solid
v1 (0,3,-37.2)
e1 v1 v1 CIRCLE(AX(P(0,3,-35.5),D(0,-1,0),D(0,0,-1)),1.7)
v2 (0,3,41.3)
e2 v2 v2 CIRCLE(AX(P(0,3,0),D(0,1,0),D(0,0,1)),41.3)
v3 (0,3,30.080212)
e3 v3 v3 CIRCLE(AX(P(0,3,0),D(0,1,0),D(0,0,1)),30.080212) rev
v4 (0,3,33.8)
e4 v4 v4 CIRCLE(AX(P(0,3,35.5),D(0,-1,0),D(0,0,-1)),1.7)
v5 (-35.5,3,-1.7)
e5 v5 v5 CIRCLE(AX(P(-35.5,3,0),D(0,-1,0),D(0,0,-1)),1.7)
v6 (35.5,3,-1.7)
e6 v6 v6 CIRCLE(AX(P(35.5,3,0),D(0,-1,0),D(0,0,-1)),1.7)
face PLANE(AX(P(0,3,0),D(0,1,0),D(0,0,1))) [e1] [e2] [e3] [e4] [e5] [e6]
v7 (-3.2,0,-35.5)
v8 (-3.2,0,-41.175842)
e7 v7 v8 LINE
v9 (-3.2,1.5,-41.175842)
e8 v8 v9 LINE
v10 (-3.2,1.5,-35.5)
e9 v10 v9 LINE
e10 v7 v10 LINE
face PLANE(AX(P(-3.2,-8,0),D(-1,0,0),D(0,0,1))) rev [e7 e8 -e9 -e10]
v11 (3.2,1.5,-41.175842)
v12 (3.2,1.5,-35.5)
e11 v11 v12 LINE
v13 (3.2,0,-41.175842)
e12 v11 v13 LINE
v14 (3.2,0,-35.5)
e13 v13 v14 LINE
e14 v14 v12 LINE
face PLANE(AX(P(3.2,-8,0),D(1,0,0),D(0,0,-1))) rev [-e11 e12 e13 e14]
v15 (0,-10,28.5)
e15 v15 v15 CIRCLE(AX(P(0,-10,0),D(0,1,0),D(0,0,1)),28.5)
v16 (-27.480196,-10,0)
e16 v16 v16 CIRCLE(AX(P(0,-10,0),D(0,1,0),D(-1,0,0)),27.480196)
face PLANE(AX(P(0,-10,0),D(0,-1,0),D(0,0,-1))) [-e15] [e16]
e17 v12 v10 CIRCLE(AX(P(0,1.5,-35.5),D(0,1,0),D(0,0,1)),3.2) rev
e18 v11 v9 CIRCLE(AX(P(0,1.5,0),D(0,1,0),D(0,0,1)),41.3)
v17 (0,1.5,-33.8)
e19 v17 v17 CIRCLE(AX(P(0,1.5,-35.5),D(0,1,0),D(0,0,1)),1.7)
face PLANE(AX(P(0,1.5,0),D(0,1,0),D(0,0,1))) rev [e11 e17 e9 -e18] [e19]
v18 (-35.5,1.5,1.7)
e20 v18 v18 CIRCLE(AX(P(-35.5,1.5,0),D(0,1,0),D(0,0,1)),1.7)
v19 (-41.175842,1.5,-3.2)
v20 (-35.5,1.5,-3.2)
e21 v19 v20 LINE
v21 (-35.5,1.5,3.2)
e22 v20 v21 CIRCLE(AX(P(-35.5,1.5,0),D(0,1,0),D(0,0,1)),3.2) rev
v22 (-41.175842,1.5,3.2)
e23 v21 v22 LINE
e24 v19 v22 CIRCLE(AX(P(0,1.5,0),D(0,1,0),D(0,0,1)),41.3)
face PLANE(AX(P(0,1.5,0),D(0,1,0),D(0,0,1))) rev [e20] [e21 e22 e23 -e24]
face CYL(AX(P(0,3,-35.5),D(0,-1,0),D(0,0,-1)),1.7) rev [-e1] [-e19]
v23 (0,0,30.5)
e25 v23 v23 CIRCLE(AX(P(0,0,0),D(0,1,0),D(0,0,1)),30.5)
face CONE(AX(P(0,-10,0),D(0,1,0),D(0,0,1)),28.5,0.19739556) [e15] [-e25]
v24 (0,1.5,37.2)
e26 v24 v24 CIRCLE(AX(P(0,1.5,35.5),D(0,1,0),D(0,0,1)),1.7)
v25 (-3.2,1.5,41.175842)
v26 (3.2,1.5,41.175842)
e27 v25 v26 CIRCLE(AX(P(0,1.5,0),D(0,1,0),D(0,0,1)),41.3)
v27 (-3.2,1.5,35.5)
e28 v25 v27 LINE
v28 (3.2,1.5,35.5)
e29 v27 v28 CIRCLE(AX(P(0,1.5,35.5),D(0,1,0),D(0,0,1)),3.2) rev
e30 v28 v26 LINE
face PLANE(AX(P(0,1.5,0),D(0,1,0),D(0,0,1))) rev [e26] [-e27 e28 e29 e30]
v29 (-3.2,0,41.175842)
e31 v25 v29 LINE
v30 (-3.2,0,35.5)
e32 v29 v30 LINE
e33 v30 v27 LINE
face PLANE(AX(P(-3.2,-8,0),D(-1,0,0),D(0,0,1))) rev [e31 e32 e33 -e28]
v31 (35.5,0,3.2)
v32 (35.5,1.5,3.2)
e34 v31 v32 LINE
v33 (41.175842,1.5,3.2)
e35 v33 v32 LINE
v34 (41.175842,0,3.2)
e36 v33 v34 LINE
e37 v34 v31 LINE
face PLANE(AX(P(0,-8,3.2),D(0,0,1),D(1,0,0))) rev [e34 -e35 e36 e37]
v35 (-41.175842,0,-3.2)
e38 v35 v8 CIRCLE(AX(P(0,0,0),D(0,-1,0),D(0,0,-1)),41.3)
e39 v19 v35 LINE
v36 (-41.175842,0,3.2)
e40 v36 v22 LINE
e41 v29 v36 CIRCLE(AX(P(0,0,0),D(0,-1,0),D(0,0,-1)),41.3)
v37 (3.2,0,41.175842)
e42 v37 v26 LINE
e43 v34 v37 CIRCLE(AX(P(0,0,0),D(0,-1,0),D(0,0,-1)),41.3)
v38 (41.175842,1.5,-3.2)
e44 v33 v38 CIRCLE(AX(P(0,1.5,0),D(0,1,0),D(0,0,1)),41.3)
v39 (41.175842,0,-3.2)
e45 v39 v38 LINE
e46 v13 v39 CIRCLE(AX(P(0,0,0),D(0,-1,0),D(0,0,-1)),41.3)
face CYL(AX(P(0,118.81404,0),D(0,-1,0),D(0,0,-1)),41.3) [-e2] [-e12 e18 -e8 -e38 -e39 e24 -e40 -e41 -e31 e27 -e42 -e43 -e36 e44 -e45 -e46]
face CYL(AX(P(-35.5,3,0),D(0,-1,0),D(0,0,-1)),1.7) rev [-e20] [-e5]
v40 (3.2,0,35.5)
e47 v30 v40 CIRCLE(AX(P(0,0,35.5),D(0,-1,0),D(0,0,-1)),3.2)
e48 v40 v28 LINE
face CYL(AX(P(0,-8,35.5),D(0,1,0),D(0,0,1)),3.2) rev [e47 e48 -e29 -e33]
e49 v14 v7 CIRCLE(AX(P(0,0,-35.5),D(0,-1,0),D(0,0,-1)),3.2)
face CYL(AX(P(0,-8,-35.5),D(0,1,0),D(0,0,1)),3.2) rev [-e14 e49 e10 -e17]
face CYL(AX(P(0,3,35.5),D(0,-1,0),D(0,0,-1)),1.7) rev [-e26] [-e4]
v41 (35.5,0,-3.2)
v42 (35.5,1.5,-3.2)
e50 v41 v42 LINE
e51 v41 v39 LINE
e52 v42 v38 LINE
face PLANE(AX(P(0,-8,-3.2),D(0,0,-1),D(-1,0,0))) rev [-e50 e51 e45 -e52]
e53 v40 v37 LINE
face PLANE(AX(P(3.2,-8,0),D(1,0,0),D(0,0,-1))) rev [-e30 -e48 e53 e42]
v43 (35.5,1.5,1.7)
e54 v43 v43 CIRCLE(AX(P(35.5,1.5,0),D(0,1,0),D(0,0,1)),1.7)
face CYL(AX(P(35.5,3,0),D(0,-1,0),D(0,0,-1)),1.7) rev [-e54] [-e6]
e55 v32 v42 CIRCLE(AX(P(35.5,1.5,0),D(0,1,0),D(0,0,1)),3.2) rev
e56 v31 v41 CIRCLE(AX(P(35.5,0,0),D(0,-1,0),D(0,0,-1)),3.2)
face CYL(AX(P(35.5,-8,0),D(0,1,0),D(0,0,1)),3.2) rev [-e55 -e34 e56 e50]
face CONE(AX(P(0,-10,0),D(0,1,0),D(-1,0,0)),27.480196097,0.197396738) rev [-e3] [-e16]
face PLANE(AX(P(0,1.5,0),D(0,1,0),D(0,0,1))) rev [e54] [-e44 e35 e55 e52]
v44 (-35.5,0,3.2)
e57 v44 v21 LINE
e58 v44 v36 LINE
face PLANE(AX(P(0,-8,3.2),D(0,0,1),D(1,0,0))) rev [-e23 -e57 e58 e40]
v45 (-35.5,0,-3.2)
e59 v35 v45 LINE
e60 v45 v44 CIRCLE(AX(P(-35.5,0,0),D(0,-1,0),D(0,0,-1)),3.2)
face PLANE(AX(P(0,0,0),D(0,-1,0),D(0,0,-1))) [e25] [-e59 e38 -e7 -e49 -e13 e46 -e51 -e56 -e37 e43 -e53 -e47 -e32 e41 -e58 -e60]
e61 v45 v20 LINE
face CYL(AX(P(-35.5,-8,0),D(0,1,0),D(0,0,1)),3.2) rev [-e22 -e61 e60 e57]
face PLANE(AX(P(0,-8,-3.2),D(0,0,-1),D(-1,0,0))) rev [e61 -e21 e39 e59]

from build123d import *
from build123d.topology import SkipClean

# Parameters (mm, degrees)
SKETCH3_R           = 40
SKETCH3_R_2         = 35.480196097
BOSS_EXTRUDE1_DEPTH = 2
BOSS_EXTRUDE2_START = -2
SKETCH4_R           = 41.3
SKETCH4_R_2         = 40
BOSS_EXTRUDE2_DEPTH = 2
CUT_EXTRUDE1_DEPTH  = 10
SKETCH7_R           = 29.880196097
BOSS_EXTRUDE3_DEPTH = 0.5
BOSS_EXTRUDE4_START = 1
SKETCH8_R           = 41.3
SKETCH8_R_2         = 29.880196097
BOSS_EXTRUDE4_DEPTH = 1
SKETCH12_R          = 1.7
CUT_EXTRUDE2_DEPTH  = 60.256898333


# Read off the part's stored shape, not the designer's step: Revolve3
with BuildPart() as part:
    # Revolve3 outline → Revolve3 (revolve)
    with BuildSketch(Plane.XY):
        Polygon((35.480196097, 2), (29.880196097, 2), (27.480196097, -10), (28.5, -10), (30.5, 0), (35.480196097, 0), align=None)
    revolve(axis=Axis((0, 0, 0), (0, 1, 0)))

    # Sketch3 → Boss-Extrude1 (add)
    with BuildSketch(Plane(origin=(0, 2, 0), x_dir=(1, 0, 0), z_dir=(0, 1, 0))):
        with Locations(Location((0, 0, 0), (0, 0, 270))):
            Circle(SKETCH3_R)
        Circle(SKETCH3_R_2, mode=Mode.SUBTRACT)
    extrude(amount=-BOSS_EXTRUDE1_DEPTH)

    # Sketch4 → Boss-Extrude2 (add)
    with BuildSketch(Plane.XZ.offset(BOSS_EXTRUDE2_START)):
        with Locations(Location((0, 0, 0), (0, 0, 270))):
            Circle(SKETCH4_R)
        Circle(SKETCH4_R_2, mode=Mode.SUBTRACT)
    extrude(amount=BOSS_EXTRUDE2_DEPTH)

    # Sketch6 → Cut-Extrude1 (cut)
    with BuildSketch(Plane(origin=(0, 2, 0), x_dir=(1, 0, 0), z_dir=(0, 1, 0))):
        with BuildLine():
            ThreePointArc((41.3, 0), (41.268948935, 1.601203852), (41.175842432, 3.2))
            Line((41.175842432, 3.2), (35.5, 3.2))
            ThreePointArc((35.5, 3.2), (32.3, 0), (35.5, -3.2))
            Line((35.5, -3.2), (41.175842432, -3.2))
            ThreePointArc((41.175842432, -3.2), (41.268948935, -1.601203852), (41.3, 0))
        make_face()
        with BuildLine():
            ThreePointArc((-3.2, -41.175842432), (0, -41.3), (3.2, -41.175842432))
            Line((3.2, -41.175842432), (3.2, -35.5))
            ThreePointArc((3.2, -35.5), (0, -32.3), (-3.2, -35.5))
            Line((-3.2, -35.5), (-3.2, -41.175842432))
        make_face()
        with BuildLine():
            Line((-35.5, 3.2), (-41.175842432, 3.2))
            ThreePointArc((-41.175842432, 3.2), (-41.3, 0), (-41.175842432, -3.2))
            Line((-41.175842432, -3.2), (-35.5, -3.2))
            ThreePointArc((-35.5, -3.2), (-32.3, 0), (-35.5, 3.2))
        make_face()
        with BuildLine():
            ThreePointArc((-3.2, 35.5), (0, 32.3), (3.2, 35.5))
            Line((3.2, 35.5), (3.2, 41.175842432))
            ThreePointArc((3.2, 41.175842432), (0, 41.3), (-3.2, 41.175842432))
            Line((-3.2, 41.175842432), (-3.2, 35.5))
        make_face()
    extrude(amount=-CUT_EXTRUDE1_DEPTH, mode=Mode.SUBTRACT)

    # Sketch7 → Boss-Extrude3 (add)
    # profile 1 of 5: a face of its own
    with SkipClean():  # the faces are left unmerged after this step: merging them gives an invalid solid
        with BuildSketch(Plane(origin=(0, 2, 0), x_dir=(1, 0, 0), z_dir=(0, 1, 0))):
            with BuildLine():
                Line((41.175842432, -3.2), (35.5, -3.2))
                ThreePointArc((35.5, -3.2), (32.3, 0), (35.5, 3.2))
                Line((35.5, 3.2), (41.175842432, 3.2))
                ThreePointArc((41.175842432, 3.2), (29.203510063, 29.203510063), (3.2, 41.175842432))
                Line((3.2, 41.175842432), (3.2, 35.5))
                ThreePointArc((3.2, 35.5), (0, 32.3), (-3.2, 35.5))
                Line((-3.2, 35.5), (-3.2, 41.175842432))
                ThreePointArc((-3.2, 41.175842432), (-29.203510063, 29.203510063), (-41.175842432, 3.2))
                Line((-41.175842432, 3.2), (-35.5, 3.2))
                ThreePointArc((-35.5, 3.2), (-32.3, 0), (-35.5, -3.2))
                Line((-35.5, -3.2), (-41.175842432, -3.2))
                ThreePointArc((-41.175842432, -3.2), (-29.203510063, -29.203510063), (-3.2, -41.175842432))
                Line((-3.2, -41.175842432), (-3.2, -35.5))
                ThreePointArc((-3.2, -35.5), (0, -32.3), (3.2, -35.5))
                Line((3.2, -35.5), (3.2, -41.175842432))
                ThreePointArc((3.2, -41.175842432), (29.203510063, -29.203510063), (41.175842432, -3.2))
            make_face()
            Circle(SKETCH7_R, mode=Mode.SUBTRACT)
        # profile 2 of 5: a face of its own
        with BuildSketch(Plane(origin=(0, 2, 0), x_dir=(1, 0, 0), z_dir=(0, 1, 0))):
            with BuildLine():
                Line((-35.5, 3.2), (-41.175842432, 3.2))
                ThreePointArc((-41.175842432, 3.2), (-41.3, 0), (-41.175842432, -3.2))
                Line((-41.175842432, -3.2), (-35.5, -3.2))
                ThreePointArc((-35.5, -3.2), (-32.3, 0), (-35.5, 3.2))
            make_face()
        # profile 3 of 5: a face of its own
        with BuildSketch(Plane(origin=(0, 2, 0), x_dir=(1, 0, 0), z_dir=(0, 1, 0))):
            with BuildLine():
                ThreePointArc((-3.2, -41.175842432), (0, -41.3), (3.2, -41.175842432))
                Line((3.2, -41.175842432), (3.2, -35.5))
                ThreePointArc((3.2, -35.5), (0, -32.3), (-3.2, -35.5))
                Line((-3.2, -35.5), (-3.2, -41.175842432))
            make_face()
        # profile 4 of 5: a face of its own
        with BuildSketch(Plane(origin=(0, 2, 0), x_dir=(1, 0, 0), z_dir=(0, 1, 0))):
            with BuildLine():
                ThreePointArc((41.175842432, -3.2), (41.268948935, -1.601203852), (41.3, 0))
                ThreePointArc((41.3, 0), (41.268948935, 1.601203852), (41.175842432, 3.2))
                Line((41.175842432, 3.2), (35.5, 3.2))
                ThreePointArc((35.5, 3.2), (32.3, 0), (35.5, -3.2))
                Line((35.5, -3.2), (41.175842432, -3.2))
            make_face()
        # profile 5 of 5: a face of its own
        with BuildSketch(Plane(origin=(0, 2, 0), x_dir=(1, 0, 0), z_dir=(0, 1, 0))):
            with BuildLine():
                Line((3.2, 35.5), (3.2, 41.175842432))
                ThreePointArc((3.2, 41.175842432), (0, 41.3), (-3.2, 41.175842432))
                Line((-3.2, 41.175842432), (-3.2, 35.5))
                ThreePointArc((-3.2, 35.5), (0, 32.3), (3.2, 35.5))
            make_face()
        extrude(amount=-BOSS_EXTRUDE3_DEPTH)

    # Sketch8 → Boss-Extrude4 (add)
    with SkipClean():  # the faces are left unmerged after this step: merging them gives an invalid solid
        with BuildSketch(Plane(origin=(0, 2, 0), x_dir=(1, 0, 0), z_dir=(0, 1, 0)).offset(BOSS_EXTRUDE4_START)):
            with Locations(Location((0, 0, 0), (0, 0, 94.4438364))):
                Circle(SKETCH8_R)
            with Locations(Location((0, 0, 0), (0, 0, 270))):
                Circle(SKETCH8_R_2, mode=Mode.SUBTRACT)
        extrude(amount=-BOSS_EXTRUDE4_DEPTH)

    # Sketch12 → Cut-Extrude2 (cut, through all)
    with SkipClean():  # the faces are left unmerged after this step: merging them gives an invalid solid
        with BuildSketch(Plane.XZ):
            with Locations(Location((0, 35.5, 0), (0, 0, 270))):
                Circle(SKETCH12_R)
            with Locations(Location((35.5, 0, 0), (0, 0, 270))):
                Circle(SKETCH12_R)
            with Locations(Location((-35.5, 0, 0), (0, 0, 270))):
                Circle(SKETCH12_R)
            with Locations(Location((0, -35.5, 0), (0, 0, 270))):
                Circle(SKETCH12_R)
        extrude(amount=-CUT_EXTRUDE2_DEPTH, mode=Mode.SUBTRACT)

    # Sketch9 → Cut-Revolve2 (revolve, cut)
    with SkipClean():  # the faces are left unmerged after this step: merging them gives an invalid solid
        with BuildSketch(Plane.XY):
            Polygon((-27.480196097, -10), (-31.397991817, 9.588858549), (0, 9.588858549), (0, -10), align=None)
        revolve(axis=Axis((0, 9.588858549, 0), (0, -1, 0)), mode=Mode.SUBTRACT)


solid = part.part
